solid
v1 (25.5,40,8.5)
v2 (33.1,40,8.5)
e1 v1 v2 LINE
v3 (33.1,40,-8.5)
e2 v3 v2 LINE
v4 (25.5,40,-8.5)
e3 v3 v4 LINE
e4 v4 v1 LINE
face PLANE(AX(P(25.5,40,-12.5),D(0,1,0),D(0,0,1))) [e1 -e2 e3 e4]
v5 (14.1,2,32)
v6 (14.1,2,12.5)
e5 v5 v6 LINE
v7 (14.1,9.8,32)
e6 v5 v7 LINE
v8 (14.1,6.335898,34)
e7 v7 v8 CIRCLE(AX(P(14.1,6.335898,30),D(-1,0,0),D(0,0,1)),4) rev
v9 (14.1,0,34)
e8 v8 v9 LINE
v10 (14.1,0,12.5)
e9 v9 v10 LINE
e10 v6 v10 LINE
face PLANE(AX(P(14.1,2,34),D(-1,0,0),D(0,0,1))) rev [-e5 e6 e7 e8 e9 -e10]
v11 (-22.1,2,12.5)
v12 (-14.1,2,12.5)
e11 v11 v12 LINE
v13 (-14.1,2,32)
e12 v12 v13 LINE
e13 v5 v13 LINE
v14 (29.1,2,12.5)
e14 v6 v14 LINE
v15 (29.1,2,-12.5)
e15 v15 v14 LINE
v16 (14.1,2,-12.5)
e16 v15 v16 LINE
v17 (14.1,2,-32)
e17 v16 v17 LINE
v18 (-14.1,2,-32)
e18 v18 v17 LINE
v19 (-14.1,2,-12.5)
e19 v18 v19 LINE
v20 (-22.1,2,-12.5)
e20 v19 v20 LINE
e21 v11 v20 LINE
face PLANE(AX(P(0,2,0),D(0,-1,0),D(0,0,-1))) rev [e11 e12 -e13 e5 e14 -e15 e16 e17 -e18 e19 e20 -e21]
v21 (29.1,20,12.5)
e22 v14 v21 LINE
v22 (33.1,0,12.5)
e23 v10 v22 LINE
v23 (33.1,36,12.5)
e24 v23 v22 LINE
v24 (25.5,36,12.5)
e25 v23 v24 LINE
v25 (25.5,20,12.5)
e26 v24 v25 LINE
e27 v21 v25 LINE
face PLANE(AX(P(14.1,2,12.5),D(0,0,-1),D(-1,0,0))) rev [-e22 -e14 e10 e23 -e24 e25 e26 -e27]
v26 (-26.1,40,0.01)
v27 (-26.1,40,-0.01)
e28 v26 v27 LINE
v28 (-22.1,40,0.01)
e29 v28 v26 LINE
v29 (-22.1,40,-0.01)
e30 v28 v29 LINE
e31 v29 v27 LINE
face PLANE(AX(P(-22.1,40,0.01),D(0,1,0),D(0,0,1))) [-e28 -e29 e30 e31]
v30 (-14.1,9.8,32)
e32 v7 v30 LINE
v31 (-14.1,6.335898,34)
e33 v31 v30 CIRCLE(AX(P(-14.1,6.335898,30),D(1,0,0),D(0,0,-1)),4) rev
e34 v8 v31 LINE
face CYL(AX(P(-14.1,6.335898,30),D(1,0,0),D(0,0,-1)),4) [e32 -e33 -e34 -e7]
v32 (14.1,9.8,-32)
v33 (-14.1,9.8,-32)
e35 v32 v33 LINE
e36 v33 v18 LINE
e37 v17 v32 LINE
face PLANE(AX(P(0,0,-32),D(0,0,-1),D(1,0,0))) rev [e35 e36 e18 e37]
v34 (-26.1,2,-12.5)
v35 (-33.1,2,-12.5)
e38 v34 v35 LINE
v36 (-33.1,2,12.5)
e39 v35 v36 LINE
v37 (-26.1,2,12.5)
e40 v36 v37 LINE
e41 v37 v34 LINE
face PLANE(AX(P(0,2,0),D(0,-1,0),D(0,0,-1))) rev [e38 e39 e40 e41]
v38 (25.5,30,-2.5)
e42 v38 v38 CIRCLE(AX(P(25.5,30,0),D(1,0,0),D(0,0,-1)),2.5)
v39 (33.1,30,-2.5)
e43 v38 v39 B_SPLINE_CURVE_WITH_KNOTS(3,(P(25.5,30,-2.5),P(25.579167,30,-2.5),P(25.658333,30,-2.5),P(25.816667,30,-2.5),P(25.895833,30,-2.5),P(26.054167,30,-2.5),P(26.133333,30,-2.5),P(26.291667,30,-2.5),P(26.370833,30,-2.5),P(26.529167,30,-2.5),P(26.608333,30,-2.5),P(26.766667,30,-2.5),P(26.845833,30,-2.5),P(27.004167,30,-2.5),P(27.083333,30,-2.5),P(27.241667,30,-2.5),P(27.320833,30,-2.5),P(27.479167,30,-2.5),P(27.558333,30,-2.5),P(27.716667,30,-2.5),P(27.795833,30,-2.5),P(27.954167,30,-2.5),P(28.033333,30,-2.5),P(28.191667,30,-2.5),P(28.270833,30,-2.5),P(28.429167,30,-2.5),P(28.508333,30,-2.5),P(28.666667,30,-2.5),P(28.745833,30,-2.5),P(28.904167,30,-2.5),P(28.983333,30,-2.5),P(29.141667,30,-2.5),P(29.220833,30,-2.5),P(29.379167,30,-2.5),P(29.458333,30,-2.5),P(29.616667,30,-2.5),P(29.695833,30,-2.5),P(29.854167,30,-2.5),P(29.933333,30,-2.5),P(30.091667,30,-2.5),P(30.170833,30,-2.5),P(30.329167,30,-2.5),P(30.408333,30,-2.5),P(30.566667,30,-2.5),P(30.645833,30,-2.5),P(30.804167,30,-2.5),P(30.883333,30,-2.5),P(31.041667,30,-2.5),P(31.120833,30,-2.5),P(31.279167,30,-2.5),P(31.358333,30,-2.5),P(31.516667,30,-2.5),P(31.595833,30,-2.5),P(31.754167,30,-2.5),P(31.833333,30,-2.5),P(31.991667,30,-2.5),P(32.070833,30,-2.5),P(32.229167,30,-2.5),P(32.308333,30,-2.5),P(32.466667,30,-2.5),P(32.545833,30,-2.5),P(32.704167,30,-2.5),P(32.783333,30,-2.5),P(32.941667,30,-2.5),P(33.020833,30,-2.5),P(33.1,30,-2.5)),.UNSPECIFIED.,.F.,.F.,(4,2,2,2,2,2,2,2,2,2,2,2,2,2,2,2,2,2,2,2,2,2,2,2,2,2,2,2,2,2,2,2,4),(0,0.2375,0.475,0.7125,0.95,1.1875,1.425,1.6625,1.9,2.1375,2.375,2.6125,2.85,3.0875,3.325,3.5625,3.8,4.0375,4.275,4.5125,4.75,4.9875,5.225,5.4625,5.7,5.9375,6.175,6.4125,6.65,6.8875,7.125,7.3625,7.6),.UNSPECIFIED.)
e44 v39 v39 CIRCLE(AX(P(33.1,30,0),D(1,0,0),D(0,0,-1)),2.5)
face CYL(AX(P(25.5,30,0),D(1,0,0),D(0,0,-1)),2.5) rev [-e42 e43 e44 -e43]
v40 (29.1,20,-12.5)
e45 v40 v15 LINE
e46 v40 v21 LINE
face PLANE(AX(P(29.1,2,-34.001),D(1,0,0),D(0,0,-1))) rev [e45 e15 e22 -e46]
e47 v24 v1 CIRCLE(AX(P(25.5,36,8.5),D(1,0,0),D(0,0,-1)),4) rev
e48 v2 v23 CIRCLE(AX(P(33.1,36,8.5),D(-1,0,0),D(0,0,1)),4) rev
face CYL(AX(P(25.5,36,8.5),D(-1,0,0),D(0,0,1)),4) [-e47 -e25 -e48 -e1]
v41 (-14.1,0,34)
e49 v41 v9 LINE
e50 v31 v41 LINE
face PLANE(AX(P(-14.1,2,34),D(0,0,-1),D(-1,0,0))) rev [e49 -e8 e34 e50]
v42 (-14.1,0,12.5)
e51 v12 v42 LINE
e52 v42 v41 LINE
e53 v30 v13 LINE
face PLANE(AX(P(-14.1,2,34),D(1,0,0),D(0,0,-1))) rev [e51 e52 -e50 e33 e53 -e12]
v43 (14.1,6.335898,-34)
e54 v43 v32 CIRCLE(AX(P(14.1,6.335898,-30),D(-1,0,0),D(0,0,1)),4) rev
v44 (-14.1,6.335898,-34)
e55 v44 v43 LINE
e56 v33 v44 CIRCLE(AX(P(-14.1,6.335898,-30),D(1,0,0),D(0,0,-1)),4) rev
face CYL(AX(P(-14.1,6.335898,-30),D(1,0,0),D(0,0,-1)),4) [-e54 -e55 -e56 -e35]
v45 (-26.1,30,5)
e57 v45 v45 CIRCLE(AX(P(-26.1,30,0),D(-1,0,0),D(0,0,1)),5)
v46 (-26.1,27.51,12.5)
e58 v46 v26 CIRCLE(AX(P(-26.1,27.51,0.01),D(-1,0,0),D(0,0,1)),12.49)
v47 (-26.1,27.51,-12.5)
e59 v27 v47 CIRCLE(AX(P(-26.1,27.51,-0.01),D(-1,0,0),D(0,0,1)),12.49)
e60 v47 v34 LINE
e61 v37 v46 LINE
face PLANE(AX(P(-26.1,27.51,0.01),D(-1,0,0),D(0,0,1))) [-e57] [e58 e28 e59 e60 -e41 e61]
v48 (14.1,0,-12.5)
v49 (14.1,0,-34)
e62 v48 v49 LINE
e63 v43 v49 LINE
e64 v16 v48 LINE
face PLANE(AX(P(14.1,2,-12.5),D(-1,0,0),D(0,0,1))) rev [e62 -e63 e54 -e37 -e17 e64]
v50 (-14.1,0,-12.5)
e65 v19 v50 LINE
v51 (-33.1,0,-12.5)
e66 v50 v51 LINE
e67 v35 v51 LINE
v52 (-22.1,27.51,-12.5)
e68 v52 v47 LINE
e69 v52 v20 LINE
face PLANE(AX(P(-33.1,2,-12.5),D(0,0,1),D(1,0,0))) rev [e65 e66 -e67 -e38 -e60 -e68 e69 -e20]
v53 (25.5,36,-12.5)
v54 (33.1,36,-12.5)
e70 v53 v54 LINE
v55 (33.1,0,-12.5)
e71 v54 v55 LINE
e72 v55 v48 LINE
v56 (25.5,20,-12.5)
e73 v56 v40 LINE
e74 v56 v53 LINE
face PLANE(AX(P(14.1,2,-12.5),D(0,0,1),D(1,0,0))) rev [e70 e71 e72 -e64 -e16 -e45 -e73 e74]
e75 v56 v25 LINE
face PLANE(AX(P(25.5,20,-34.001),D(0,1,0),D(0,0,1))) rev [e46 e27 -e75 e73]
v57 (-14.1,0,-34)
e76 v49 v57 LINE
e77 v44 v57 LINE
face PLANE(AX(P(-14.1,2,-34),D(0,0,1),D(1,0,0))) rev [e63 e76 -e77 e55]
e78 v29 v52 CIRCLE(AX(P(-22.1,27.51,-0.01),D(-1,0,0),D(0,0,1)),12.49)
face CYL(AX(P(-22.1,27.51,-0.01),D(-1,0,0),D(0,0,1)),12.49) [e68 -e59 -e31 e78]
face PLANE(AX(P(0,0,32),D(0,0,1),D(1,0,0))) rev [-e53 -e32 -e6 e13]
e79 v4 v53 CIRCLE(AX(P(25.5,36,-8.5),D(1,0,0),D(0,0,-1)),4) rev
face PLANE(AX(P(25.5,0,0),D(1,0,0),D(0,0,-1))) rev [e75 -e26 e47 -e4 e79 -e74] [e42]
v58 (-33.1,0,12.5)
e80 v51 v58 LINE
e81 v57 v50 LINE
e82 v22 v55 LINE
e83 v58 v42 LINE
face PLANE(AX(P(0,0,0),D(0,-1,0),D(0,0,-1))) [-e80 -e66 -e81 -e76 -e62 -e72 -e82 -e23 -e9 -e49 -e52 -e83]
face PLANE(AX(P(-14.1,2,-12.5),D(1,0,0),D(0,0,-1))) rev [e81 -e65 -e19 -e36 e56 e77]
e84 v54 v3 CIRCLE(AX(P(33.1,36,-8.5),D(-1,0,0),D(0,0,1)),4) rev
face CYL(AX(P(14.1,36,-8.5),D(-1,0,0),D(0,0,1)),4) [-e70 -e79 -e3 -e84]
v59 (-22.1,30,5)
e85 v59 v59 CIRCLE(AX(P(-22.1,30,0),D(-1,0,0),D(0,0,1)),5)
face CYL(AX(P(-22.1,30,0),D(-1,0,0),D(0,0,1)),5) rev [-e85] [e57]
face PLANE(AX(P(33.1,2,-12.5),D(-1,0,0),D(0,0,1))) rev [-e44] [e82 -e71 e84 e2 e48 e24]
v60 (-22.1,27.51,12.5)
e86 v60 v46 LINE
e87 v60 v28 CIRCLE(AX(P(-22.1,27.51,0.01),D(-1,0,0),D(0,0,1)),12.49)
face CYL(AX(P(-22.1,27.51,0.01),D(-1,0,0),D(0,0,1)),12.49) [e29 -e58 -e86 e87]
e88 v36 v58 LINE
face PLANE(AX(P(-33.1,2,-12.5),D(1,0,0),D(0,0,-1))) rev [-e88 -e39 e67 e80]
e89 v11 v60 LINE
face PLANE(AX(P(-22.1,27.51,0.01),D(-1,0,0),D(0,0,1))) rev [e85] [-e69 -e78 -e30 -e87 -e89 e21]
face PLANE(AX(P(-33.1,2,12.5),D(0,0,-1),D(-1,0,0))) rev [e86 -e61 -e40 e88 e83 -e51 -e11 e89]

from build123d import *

# Parameters (mm, degrees)
BOSS_EXTRUDE1_DEPTH  = 2
SKETCH2_W            = 28.2
SKETCH2_H            = 9.8
BOSS_EXTRUDE2_DEPTH  = 2
FILLET1_R            = 4
FILLET1_OF_MIRROR2_R = 4
SKETCH3_W            = 25
SKETCH3_H            = 40
SKETCH3_R            = 2.5
BOSS_EXTRUDE3_DEPTH  = 7.6
FILLET2_R            = 4
CUT_EXTRUDE1_REACH   = 71.698
SKETCH4_W            = 3.6
SKETCH4_H            = 18
SKETCH5_R            = 5
BOSS_EXTRUDE4_DEPTH  = 4


with BuildPart() as part:
    # Sketch1 → Boss-Extrude1 (new body)
    with BuildSketch(Plane(origin=(0, 0, 0), x_dir=(1, 0, 0), z_dir=(0, 1, 0))):
        Polygon((-14.1, 12.5), (-14.1, 34), (14.1, 34), (14.1, 12.5), (33.1, 12.5), (33.1, -12.5), (14.1, -12.5), (14.1, -34), (-14.1, -34), (-14.1, -12.5), (-33.1, -12.5), (-33.1, 12.5), align=None)
    boss_extrude1 = extrude(amount=BOSS_EXTRUDE1_DEPTH)

    # Sketch2 → Boss-Extrude2 (add)
    with BuildSketch(Plane.XY.offset(34)):
        with Locations((0, 4.9)):
            Rectangle(SKETCH2_W, SKETCH2_H)
    boss_extrude2 = extrude(amount=-BOSS_EXTRUDE2_DEPTH)

    # Fillet1
    # the kernel refuses this fillet: 4 mm, written as the material it takes off along each edge
    with BuildSketch(Plane(origin=(-22.760254038, 9.8, 34), x_dir=(0, -1, 0), z_dir=(1, 0, 0))) as fillet1_piece_1:
        with BuildLine():
            CenterArc((3.464101615, 4), FILLET1_R, 210, 60)
            Line((0, 2), (-0.069282032, 1.96))
            ThreePointArc((-0.069282032, 1.96), (-0.08, 1), (-0.08, 0))
            Line((-0.08, 0), (0, -0.08))
            Line((0, -0.08), (3.464101615, -0.08))
            Line((3.464101615, -0.08), (3.464101615, 0))
        make_face()
    extrude(amount=45.520508076, mode=Mode.SUBTRACT)

    # Mirror2: Boss-Extrude1, Boss-Extrude2 across plane
    add(boss_extrude1.mirror(Plane.XY))
    add(boss_extrude2.mirror(Plane.XY))

    # Fillet1 of Mirror2
    # the kernel refuses this fillet: 4 mm, written as the material it takes off along each edge
    with BuildSketch(Plane(origin=(-22.760254038, 9.8, -34), x_dir=(0, -1, 0), z_dir=(1, 0, 0))) as fillet1_of_mirror2_piece_1:
        with BuildLine():
            CenterArc((3.464101615, -4), FILLET1_OF_MIRROR2_R, 90, 60)
            Line((0, -2), (-0.069282032, -1.96))
            ThreePointArc((-0.069282032, -1.96), (-0.08, -1), (-0.08, 0))
            Line((-0.08, 0), (0, 0.08))
            Line((0, 0.08), (3.464101615, 0.08))
            Line((3.464101615, 0.08), (3.464101615, 0))
        make_face()
    extrude(amount=45.520508076, mode=Mode.SUBTRACT)

    # Sketch3 → Boss-Extrude3 (add)
    with BuildSketch(Plane(origin=(33.1, 0, 0), x_dir=(0, 0, -1), z_dir=(1, 0, 0))):
        with Locations((0, 20)):
            Rectangle(SKETCH3_W, SKETCH3_H)
        with Locations((0, 30)):
            Circle(SKETCH3_R, mode=Mode.SUBTRACT)
    extrude(amount=-BOSS_EXTRUDE3_DEPTH)

    # Fillet2
    fillet2_edges = [part.edges().sort_by_distance(p)[0] for p in [
        (29.3, 40, -12.5),
        (29.3, 40, 12.5),
    ]]
    fillet(fillet2_edges, radius=FILLET2_R)

    # Sketch4 → Cut-Extrude1 (cut, up to next)
    with BuildSketch(Plane.XY.offset(12.5), mode=Mode.PRIVATE) as cut_extrude1_sk1:
        with Locations((27.3, 11)):
            Rectangle(SKETCH4_W, SKETCH4_H)
    cut_extrude1_tool1 = extrude(cut_extrude1_sk1.sketch, amount=-CUT_EXTRUDE1_REACH, mode=Mode.PRIVATE) & part.part
    add(cut_extrude1_tool1.solids().sort_by_distance((27.3, 11, 12.5))[0], mode=Mode.SUBTRACT)

    # Sketch5 → Boss-Extrude4 (add)
    with BuildSketch(Plane.ZY.offset(26.1)):
        with BuildLine():
            Line((12.5, 0), (-12.5, 0))
            Line((-12.5, 0), (-12.5, 27.51))
            ThreePointArc((-12.5, 27.51), (-8.841763697, 36.341763697), (-0.01, 40))
            Line((-0.01, 40), (0.01, 40))
            ThreePointArc((0.01, 40), (8.841763697, 36.341763697), (12.5, 27.51))
            Line((12.5, 27.51), (12.5, 0))
        make_face()
        with Locations((0, 30)):
            Circle(SKETCH5_R, mode=Mode.SUBTRACT)
    extrude(amount=-BOSS_EXTRUDE4_DEPTH)


solid = part.part
